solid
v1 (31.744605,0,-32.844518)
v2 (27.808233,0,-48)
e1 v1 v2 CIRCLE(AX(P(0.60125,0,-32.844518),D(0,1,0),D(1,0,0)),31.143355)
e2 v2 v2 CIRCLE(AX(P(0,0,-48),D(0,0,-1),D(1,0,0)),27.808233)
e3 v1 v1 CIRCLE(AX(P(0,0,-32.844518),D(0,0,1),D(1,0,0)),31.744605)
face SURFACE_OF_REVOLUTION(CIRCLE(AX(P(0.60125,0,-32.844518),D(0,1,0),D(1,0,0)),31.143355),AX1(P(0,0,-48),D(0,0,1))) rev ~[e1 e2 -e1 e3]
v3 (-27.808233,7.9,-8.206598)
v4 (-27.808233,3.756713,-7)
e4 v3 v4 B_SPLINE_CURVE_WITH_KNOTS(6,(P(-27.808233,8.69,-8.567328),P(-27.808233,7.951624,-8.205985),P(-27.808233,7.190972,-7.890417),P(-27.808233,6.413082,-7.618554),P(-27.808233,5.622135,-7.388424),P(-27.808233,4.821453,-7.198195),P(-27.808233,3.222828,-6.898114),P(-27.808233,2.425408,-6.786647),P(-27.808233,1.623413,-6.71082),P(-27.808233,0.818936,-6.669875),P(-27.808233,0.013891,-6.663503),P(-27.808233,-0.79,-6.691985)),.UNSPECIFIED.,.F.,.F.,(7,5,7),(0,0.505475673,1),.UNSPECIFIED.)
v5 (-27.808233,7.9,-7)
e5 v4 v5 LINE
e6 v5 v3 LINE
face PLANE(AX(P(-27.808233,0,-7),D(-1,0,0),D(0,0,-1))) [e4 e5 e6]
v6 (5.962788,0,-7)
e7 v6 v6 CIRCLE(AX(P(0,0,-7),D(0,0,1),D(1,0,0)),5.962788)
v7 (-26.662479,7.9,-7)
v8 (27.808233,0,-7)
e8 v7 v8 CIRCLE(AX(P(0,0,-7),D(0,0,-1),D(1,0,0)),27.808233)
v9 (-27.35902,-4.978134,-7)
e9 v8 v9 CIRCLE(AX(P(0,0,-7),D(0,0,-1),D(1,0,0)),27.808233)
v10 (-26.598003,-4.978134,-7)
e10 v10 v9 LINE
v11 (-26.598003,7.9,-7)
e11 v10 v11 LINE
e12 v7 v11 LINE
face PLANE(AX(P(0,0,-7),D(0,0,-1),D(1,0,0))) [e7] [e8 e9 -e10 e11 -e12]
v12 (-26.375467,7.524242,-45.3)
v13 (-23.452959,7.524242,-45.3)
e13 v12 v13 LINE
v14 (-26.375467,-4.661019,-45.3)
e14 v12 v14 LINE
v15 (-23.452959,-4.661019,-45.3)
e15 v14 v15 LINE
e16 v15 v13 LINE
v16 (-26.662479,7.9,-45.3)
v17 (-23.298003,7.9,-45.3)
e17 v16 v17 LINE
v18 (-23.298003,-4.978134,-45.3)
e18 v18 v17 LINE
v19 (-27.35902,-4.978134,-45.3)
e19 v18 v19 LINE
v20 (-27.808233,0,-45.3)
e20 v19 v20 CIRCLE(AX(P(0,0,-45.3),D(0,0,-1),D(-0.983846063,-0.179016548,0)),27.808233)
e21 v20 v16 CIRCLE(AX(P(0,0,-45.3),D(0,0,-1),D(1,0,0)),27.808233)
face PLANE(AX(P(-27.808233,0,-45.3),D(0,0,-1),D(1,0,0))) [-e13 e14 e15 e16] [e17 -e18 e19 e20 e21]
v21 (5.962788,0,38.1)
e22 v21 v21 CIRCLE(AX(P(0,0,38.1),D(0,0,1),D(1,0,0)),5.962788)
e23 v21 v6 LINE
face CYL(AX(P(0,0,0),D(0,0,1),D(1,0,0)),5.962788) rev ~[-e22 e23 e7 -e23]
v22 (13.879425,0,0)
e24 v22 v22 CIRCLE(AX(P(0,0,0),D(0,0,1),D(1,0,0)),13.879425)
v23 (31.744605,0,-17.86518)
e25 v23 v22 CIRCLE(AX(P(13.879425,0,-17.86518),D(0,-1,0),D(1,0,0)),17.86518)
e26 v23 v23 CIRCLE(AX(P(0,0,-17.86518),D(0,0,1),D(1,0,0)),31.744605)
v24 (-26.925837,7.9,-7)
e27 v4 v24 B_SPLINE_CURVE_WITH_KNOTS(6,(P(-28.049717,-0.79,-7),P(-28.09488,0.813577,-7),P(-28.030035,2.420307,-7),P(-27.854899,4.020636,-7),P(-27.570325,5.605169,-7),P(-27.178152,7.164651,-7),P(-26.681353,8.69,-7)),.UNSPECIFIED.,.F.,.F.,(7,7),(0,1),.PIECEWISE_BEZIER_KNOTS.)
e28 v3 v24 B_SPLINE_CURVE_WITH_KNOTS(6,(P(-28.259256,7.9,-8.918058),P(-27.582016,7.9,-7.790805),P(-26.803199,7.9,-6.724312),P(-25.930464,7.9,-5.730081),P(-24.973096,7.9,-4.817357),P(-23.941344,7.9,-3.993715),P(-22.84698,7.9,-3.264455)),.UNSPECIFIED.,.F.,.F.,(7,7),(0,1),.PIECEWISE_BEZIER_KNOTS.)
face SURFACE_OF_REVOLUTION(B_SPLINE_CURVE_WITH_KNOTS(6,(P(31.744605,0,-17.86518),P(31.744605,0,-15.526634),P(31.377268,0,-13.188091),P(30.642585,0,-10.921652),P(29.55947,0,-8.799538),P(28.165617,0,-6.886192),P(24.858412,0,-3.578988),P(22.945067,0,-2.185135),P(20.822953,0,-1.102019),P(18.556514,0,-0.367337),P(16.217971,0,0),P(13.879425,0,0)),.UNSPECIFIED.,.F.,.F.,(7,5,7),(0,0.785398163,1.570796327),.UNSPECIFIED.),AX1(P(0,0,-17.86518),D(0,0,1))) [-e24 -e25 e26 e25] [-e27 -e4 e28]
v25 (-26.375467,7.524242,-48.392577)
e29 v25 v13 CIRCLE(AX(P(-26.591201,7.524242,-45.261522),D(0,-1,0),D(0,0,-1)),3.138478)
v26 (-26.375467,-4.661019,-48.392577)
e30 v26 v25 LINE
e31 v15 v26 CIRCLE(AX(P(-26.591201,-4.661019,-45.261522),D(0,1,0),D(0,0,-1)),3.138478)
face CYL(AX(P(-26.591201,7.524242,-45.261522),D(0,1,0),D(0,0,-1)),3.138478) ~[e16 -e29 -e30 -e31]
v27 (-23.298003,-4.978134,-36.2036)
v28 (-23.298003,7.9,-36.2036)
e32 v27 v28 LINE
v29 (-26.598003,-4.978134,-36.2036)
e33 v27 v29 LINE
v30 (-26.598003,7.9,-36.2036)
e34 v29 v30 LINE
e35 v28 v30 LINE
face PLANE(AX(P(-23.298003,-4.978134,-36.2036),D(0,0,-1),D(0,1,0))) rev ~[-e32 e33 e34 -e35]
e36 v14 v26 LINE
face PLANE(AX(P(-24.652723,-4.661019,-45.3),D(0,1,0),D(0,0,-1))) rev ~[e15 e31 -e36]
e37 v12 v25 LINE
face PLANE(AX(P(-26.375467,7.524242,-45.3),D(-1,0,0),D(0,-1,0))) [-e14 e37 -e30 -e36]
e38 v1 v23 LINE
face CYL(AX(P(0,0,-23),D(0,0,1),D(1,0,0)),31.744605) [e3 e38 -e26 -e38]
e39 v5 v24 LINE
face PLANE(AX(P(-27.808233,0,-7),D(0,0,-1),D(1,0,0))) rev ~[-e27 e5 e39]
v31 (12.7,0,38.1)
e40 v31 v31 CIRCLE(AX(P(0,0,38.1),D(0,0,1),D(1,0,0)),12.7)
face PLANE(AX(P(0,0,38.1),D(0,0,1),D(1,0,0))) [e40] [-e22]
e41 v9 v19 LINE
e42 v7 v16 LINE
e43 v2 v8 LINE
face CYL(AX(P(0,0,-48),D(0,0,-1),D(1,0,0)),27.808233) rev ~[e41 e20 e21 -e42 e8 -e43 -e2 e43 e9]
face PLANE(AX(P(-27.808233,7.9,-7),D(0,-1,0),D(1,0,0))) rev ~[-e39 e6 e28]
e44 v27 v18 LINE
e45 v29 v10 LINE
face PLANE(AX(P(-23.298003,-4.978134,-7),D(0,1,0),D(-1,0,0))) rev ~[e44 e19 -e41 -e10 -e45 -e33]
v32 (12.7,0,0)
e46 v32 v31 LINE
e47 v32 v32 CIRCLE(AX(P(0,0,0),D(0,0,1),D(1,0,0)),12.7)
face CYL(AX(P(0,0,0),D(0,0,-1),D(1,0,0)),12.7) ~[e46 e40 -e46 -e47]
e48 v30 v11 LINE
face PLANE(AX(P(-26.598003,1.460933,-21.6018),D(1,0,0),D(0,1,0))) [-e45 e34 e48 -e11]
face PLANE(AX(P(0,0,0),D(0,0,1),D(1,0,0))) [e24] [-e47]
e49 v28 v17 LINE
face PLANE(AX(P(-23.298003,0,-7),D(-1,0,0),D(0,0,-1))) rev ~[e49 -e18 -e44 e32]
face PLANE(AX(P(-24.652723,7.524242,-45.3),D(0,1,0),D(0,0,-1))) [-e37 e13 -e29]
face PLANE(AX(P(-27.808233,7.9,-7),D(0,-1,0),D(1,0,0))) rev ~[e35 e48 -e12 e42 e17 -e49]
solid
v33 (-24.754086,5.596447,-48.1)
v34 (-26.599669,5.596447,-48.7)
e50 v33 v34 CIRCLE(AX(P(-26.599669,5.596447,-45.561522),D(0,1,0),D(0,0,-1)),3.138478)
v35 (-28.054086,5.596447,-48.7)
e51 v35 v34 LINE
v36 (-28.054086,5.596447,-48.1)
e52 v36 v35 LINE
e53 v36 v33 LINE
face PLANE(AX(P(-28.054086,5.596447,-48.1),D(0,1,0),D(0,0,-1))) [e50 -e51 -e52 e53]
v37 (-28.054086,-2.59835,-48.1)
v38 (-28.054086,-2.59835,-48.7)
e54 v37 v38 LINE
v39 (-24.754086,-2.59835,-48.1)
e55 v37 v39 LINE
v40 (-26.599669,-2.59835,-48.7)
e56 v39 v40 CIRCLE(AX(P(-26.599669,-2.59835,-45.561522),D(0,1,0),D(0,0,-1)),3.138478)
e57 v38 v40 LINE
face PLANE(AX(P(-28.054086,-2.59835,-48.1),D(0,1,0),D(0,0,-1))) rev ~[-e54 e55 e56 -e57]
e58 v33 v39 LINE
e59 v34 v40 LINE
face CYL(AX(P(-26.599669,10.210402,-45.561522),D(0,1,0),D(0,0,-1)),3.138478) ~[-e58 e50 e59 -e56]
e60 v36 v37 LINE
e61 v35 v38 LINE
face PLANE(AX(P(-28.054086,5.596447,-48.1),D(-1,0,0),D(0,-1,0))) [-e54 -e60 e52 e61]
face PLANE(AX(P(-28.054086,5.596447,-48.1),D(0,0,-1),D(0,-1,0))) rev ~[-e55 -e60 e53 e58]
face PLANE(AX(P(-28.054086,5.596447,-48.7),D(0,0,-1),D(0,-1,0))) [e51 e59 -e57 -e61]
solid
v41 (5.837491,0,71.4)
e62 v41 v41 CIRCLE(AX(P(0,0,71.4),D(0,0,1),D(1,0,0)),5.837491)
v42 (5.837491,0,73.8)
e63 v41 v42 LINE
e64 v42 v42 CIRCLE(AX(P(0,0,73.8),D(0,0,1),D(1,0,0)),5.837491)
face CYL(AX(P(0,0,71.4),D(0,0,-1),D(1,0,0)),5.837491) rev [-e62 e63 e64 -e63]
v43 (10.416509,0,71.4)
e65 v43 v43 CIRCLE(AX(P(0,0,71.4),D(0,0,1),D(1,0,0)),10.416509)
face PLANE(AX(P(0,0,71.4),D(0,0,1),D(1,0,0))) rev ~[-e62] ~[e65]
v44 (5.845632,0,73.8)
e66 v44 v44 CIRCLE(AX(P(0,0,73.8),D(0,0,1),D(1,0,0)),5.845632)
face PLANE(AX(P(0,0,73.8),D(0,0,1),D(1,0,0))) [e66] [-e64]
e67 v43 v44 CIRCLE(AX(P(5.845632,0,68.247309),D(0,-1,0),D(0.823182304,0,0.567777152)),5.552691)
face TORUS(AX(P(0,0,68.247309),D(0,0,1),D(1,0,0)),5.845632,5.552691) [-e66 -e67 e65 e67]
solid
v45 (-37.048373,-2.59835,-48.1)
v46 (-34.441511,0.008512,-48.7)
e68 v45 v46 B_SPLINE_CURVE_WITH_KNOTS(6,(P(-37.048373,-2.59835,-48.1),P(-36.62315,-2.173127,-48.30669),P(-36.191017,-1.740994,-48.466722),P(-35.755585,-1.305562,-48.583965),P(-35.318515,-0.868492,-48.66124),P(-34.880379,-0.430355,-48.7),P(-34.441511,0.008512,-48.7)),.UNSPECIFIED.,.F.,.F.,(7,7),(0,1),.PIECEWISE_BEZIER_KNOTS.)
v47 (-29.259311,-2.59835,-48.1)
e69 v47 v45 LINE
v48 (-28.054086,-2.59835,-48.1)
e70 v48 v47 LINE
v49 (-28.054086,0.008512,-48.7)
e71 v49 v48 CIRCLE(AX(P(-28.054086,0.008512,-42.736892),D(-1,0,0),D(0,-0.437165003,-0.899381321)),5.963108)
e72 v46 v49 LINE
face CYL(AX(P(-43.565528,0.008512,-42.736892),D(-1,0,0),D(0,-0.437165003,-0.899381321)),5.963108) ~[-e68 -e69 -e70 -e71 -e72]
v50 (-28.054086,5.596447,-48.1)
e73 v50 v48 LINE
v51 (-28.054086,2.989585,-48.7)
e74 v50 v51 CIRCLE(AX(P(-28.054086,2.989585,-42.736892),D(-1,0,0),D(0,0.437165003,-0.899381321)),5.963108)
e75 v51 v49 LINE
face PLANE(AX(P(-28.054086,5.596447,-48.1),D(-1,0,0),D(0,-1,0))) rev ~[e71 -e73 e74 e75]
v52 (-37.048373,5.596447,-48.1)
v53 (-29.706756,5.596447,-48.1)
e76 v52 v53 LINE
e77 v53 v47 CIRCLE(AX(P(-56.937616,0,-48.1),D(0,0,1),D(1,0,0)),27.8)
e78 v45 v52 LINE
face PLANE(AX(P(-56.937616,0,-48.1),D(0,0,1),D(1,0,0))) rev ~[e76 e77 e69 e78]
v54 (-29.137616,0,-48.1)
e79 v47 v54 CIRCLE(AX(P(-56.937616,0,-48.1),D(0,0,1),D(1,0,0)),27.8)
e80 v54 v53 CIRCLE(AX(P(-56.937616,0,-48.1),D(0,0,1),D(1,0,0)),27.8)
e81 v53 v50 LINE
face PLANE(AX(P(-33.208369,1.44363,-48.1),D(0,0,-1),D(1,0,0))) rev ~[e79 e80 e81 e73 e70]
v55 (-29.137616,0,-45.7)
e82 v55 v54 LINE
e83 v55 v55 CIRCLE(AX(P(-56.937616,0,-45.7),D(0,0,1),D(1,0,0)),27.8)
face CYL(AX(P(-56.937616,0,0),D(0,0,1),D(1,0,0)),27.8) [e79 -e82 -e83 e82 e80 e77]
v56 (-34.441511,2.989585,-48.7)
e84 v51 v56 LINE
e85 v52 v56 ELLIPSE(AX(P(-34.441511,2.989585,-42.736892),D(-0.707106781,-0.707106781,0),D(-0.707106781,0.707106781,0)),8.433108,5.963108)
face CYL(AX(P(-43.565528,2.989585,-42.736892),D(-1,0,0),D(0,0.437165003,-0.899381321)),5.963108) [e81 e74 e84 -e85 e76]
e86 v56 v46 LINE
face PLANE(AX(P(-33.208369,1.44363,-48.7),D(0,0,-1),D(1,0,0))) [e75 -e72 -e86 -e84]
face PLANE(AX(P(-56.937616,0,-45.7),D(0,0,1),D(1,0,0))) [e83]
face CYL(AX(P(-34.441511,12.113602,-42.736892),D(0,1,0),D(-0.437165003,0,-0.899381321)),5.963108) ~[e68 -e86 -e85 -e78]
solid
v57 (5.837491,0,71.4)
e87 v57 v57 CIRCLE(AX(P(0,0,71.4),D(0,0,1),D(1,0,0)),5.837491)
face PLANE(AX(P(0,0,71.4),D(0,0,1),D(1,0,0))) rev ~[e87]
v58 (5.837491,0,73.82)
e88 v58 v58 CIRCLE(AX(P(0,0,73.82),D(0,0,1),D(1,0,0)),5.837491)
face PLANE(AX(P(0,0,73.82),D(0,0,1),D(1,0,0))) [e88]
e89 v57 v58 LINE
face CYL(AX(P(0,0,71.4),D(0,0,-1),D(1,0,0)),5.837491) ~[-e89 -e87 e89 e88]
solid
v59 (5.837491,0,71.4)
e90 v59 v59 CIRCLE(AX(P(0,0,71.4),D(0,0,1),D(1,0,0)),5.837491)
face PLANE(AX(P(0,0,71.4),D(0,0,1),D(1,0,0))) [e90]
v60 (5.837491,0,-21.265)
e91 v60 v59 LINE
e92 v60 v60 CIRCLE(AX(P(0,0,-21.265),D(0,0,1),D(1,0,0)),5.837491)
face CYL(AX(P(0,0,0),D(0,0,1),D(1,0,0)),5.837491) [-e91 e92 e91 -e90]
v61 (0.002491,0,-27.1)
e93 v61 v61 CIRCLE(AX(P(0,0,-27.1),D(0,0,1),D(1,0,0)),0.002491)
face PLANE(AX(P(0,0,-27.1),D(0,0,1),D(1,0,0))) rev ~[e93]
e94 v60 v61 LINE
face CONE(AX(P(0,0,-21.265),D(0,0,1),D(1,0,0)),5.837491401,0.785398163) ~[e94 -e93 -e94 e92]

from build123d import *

# Parameters (mm, degrees)
F0_R           = 12.7
F1_DEPTH       = 38.1
F2_R           = 5.9627881531
F3_DEPTH       = 38.101
F4_R           = 31.7446048685
F5_DEPTH       = 23
F6_DEPTH       = 25
F7_R           = 27.8082327549
F8_DEPTH       = 41
F9_DEPTH       = 49
F10_R          = 17.8651803616
F13_DEPTH      = 38.3
F14_DEPTH      = 7.9
F15_W          = 12.8781338312
F15_H          = 29.2036004663
F16_DEPTH      = 3.3
F17_W          = 1.7227437347
F17_H          = 12.1852611192
F18_DEPTH      = 3.1
F19_R          = 27.8
F20_DEPTH      = 48.1
F21_DEPTH      = 45.7
F23_DEPTH      = 0.6
F24_R          = 5.8374914011
F25_DEPTH      = 27.1
F26_DEPTH      = 71.4
F27_R          = 10.4165090819
F27_R_2        = 5.8374914011
F28_DEPTH      = 2.4
F29_DEPTH      = 2.6
F30_DEPTH      = 3.3
F31_DEPTH      = 1.2
F32_T4_DEPTH   = 20.0314551969
F32_2_T1_DEPTH = 17.4227077627
F33_SIZE       = 5.835
F35_DEPTH      = 0.18
F36_T1_DEPTH   = 13.8587724822
F36_T3_DEPTH   = 8.1698239296
F36_T5_DEPTH   = 21.2291069713
F36_T7_DEPTH   = 7.7223795322
F36_T9_DEPTH   = 14.3062168796


# Not quite as in the source:
# - a fillet or chamfer that OpenCascade refuses, or shapes differently, is made with other operations: its cross-section is extruded or revolved along the edge and cut away or added


with BuildPart() as f1:
    # F0 (on Top) → F1 (new body)
    with BuildSketch(Plane.XY):
        Circle(F0_R)
    extrude(amount=F1_DEPTH)

    # F2 (on face) → F3 (cut, through all)
    with BuildSketch(Plane.XY.offset(38.1)):
        Circle(F2_R)
    extrude(amount=-F3_DEPTH, mode=Mode.SUBTRACT)

    # F4 (on Top) → F5 (join)
    with BuildSketch(Plane.XY):
        Circle(F4_R)
    extrude(amount=-F5_DEPTH)

    # F6 (add): a face of the model
    f6_faces = [f1.faces().sort_by_distance(p)[0] for p in [
        (0, 0, -23),
    ]]
    extrude(f6_faces, amount=F6_DEPTH)

    # F7 (on face) → F8 (cut)
    with BuildSketch(Plane(origin=(0, 0, -48), x_dir=(1, 0, 0), z_dir=(0, 0, -1))):
        Circle(F7_R)
    extrude(amount=-F8_DEPTH, mode=Mode.SUBTRACT)

    # F9 (cut): a face of the model
    f9_faces = [f1.faces().sort_by_distance(p)[0] for p in [
        (0, 0, 0),
    ]]
    extrude(f9_faces, amount=-F9_DEPTH, mode=Mode.SUBTRACT)

    # F10
    f10_edges = [f1.edges().sort_by_distance(p)[0] for p in [
        (-31.744605, 0, 0),
    ]]
    fillet(f10_edges, radius=F10_R)

    # F11: fillet of radius 31.1433549546 on 1 edges, made by hand

    # F11_s1 → F11_t2 (revolve, cut)
    with BuildSketch(Plane.XZ):
        with BuildLine():
            ThreePointArc((31.7446048685, -32.8445177405), (30.7444521466, -40.6736886407), (27.8082327549, -48))
            Line((27.8082327549, -48), (28.3523724117, -48.3031096452))
            ThreePointArc((28.3523724117, -48.3031096452), (29.7764188117, -48.6228670991), (31.7446048685, -48.6228670991))
            Line((31.7446048685, -48.6228670991), (32.3674719676, -48))
            Line((32.3674719676, -48), (32.3674719676, -32.8445177405))
            Line((32.3674719676, -32.8445177405), (31.7446048685, -32.8445177405))
        make_face()
    revolve(axis=Axis((0, 0, -48), (0, 0, 1)), mode=Mode.SUBTRACT)

    # F12 (on face) → F13 (join)
    with BuildSketch(Plane(origin=(0, 0, -7), x_dir=(1, 0, 0), z_dir=(0, 0, -1))):
        with BuildLine():
            ThreePointArc((-27.3590203134, 4.9781338312), (-27.6957019569, 2.4991802785), (-27.8082327549, 0))
            Line((-27.8082327549, 0), (-23.2980027795, 0))
            Line((-23.2980027795, 0), (-23.2980027795, 4.9781338312))
            Line((-23.2980027795, 4.9781338312), (-27.3590203134, 4.9781338312))
        make_face()
    extrude(amount=F13_DEPTH)

    # F14 (add): a face of the model
    f14_faces = [f1.faces().sort_by_distance(p)[0] for p in [
        (-25.5531177672, 0, -26.15),
    ]]
    extrude(f14_faces, amount=F14_DEPTH)

    # F15 (on face) → F16 (cut)
    with BuildSketch(Plane.YZ.offset(-23.2980027795)):
        with Locations((1.4609330844, -21.6018002331)):
            Rectangle(F15_W, F15_H)
    extrude(amount=-F16_DEPTH, mode=Mode.SUBTRACT)

    # F17 (on face) → F18 (join)
    with BuildSketch(Plane(origin=(0, 0, -45.3), x_dir=(1, 0, 0), z_dir=(0, 0, -1))):
        with Locations((-25.5140950903, -1.4316115994)):
            Rectangle(F17_W, F17_H)
    extrude(amount=F18_DEPTH)

    # F31 (add): a face of the model
    f31_faces = [f1.faces().sort_by_distance(p)[0] for p in [
        (-24.652723223, 1.4316115994, -46.85),
    ]]
    extrude(f31_faces, amount=F31_DEPTH)

    # F32: fillet of radius 3.1384776311 on 1 edges, made by hand


with BuildPart() as f20:
    # F19 (on Top) → F20 (new body)
    with BuildSketch(Plane.XY):
        with Locations((-56.9376163185, 0)):
            Circle(F19_R)
    extrude(amount=-F20_DEPTH)

    # F21 (cut): a face of the model
    f21_faces = [f20.faces().sort_by_distance(p)[0] for p in [
        (-56.9376163185, 0, 0),
    ]]
    extrude(f21_faces, amount=-F21_DEPTH, mode=Mode.SUBTRACT)

    # F22 (on face) → F23 (join)
    with BuildSketch(Plane(origin=(0, 0, -48.1), x_dir=(1, 0, 0), z_dir=(0, 0, -1))):
        with BuildLine():
            ThreePointArc((-29.1376163185, 0), (-29.1680566948, 1.3005992115), (-29.2593111608, 2.5983501691))
            Line((-29.2593111608, 2.5983501691), (-37.0483733714, 2.5983501691))
            Line((-37.0483733714, 2.5983501691), (-37.0483733714, -5.5964472704))
            Line((-37.0483733714, -5.5964472704), (-29.7067555544, -5.5964472704))
            ThreePointArc((-29.7067555544, -5.5964472704), (-29.2802671212, -2.8126562854), (-29.1376163185, 0))
        make_face()
        with BuildLine():
            Line((-28.0540864915, -5.5964472704), (-28.0540864915, 2.5983501691))
            Line((-28.0540864915, 2.5983501691), (-29.2593111608, 2.5983501691))
            ThreePointArc((-29.2593111608, 2.5983501691), (-29.1680566948, 1.3005992115), (-29.1376163185, 0))
            ThreePointArc((-29.1376163185, 0), (-29.2802671212, -2.8126562854), (-29.7067555544, -5.5964472704))
            Line((-29.7067555544, -5.5964472704), (-28.0540864915, -5.5964472704))
        make_face()
    extrude(amount=F23_DEPTH)


with BuildPart() as f25:
    # F24 (on Top) → F25 (new body)
    with BuildSketch(Plane.XY):
        Circle(F24_R)
    extrude(amount=-F25_DEPTH)

    # F26 (add): a face of the model
    f26_faces = [f25.faces().sort_by_distance(p)[0] for p in [
        (0, 0, 0),
    ]]
    extrude(f26_faces, amount=F26_DEPTH)


with BuildPart() as f28:
    # F27 (on face) → F28 (new body)
    with BuildSketch(Plane.XY.offset(71.4)):
        Circle(F27_R)
        Circle(F27_R_2, mode=Mode.SUBTRACT)
    extrude(amount=F28_DEPTH)

    # F34: fillet of radius 5.5526911935 on 1 edges, made by hand

    # F34_s1 → F34_t2 (revolve, cut)
    with BuildSketch(Plane.XZ):
        with BuildLine():
            ThreePointArc((10.4165090819, 71.4), (8.426955147, 73.1635217858), (5.8456319529, 73.8))
            Line((5.8456319529, 73.8), (10.4165090819, 73.8))
            Line((10.4165090819, 73.8), (10.4165090819, 71.4))
        make_face()
    revolve(axis=Axis((0, 0, 73.8), (0, 0, 1)), mode=Mode.SUBTRACT)


with BuildPart() as f29:
    # F29 (new): a face of the model
    f29_faces = [f25.part.faces().sort_by_distance(p)[0] for p in [
        (0, 0, 71.4),
    ]]
    extrude(f29_faces, amount=F29_DEPTH)

    # F35 (cut): a face of the model
    f35_faces = [f29.faces().sort_by_distance(p)[0] for p in [
        (0, 0, 74),
    ]]
    extrude(f35_faces, amount=-F35_DEPTH, mode=Mode.SUBTRACT)


with BuildPart() as f30:
    # F30 (new): a face of the model
    f30_faces = [f20.part.faces().sort_by_distance(p)[0] for p in [
        (-28.0540864915, 1.4990485506, -48.4),
    ]]
    extrude(f30_faces, amount=F30_DEPTH)

    # F32#2: fillet of radius 3.1384776311 on 1 edges, made by hand

    # F32_2_s2 → F32_2_t1 (cut)
    with BuildSketch(Plane.XZ.offset(-10.210402432)):
        with BuildLine():
            ThreePointArc((-26.5996685561, -48.7), (-25.6293370203, -48.5462331676), (-24.7540864915, -48.1))
            Line((-24.7540864915, -48.1), (-24.7540864915, -48.7))
            Line((-24.7540864915, -48.7), (-26.5996685561, -48.7))
        make_face()
    extrude(amount=F32_2_T1_DEPTH, mode=Mode.SUBTRACT)


with BuildPart() as f32_tool2:
    # F32_s3 → F32_t4 (new body)
    with BuildSketch(Plane.XZ.offset(-7.524242159)):
        with BuildLine():
            ThreePointArc((-26.5912008541, -48.4), (-24.3719620385, -47.4807611845), (-23.452723223, -45.2615223689))
            Line((-23.452723223, -45.2615223689), (-23.452723223, -48.4))
            Line((-23.452723223, -48.4), (-26.5912008541, -48.4))
        make_face()
    extrude(amount=F32_T4_DEPTH)

    split(bisect_by=Plane.XY.offset(-45.3), keep=Keep.BOTTOM)

    split(bisect_by=Plane.XZ.offset(4.9781338312), keep=Keep.BOTTOM)


with BuildPart() as f1_1:
    add(f1.part)

    # F32_t1: cut F32_tool2
    add(f32_tool2.part, mode=Mode.SUBTRACT)


with BuildPart() as f25_1:
    add(f25.part)

    # F33
    f33_edges = [f25_1.edges().sort_by_distance(p)[0] for p in [
        (-5.837491, 0, -27.1),
    ]]
    chamfer(f33_edges, length=F33_SIZE)


with BuildPart() as f20_1:
    add(f20.part)

    # F36: fillet of radius 5.9631074991 on 3 edges, made by hand

    # F36_s2 → F36_t1 (cut)
    with BuildSketch(Plane.YZ.offset(-43.5655281373)):
        with BuildLine():
            ThreePointArc((5.5964472704, -48.1), (4.3270950835, -48.5480643961), (2.989585364, -48.7))
            Line((2.989585364, -48.7), (5.5964472704, -48.7))
            Line((5.5964472704, -48.7), (5.5964472704, -48.1))
        make_face()
    extrude(amount=F36_T1_DEPTH, mode=Mode.SUBTRACT)

    # F36_s4 → F36_t3 (cut)
    with BuildSketch(Plane.YZ.offset(-29.7067556551)):
        with BuildLine():
            ThreePointArc((5.5964472704, -48.1), (4.3270950835, -48.5480643961), (2.989585364, -48.7))
            Line((2.989585364, -48.7), (5.5964472704, -48.7))
            Line((5.5964472704, -48.7), (5.5964472704, -48.1))
        make_face()
    extrude(amount=F36_T3_DEPTH, mode=Mode.SUBTRACT)

    # F36_s6 → F36_t5 (cut)
    with BuildSketch(Plane.XZ.offset(-12.1136020363)):
        with BuildLine():
            ThreePointArc((-37.0483733714, -48.1), (-35.7790211845, -48.5480643961), (-34.441511465, -48.7))
            Line((-34.441511465, -48.7), (-37.0483733714, -48.7))
            Line((-37.0483733714, -48.7), (-37.0483733714, -48.1))
        make_face()
    extrude(amount=F36_T5_DEPTH, mode=Mode.SUBTRACT)

    # F36_s8 → F36_t7 (cut)
    with BuildSketch(Plane.YZ.offset(-29.2593112577)):
        with BuildLine():
            ThreePointArc((-2.5983501691, -48.1), (-1.3289979823, -48.5480643961), (0.0085117372, -48.7))
            Line((0.0085117372, -48.7), (-2.5983501691, -48.7))
            Line((-2.5983501691, -48.7), (-2.5983501691, -48.1))
        make_face()
    extrude(amount=F36_T7_DEPTH, mode=Mode.SUBTRACT)

    # F36_s10 → F36_t9 (cut)
    with BuildSketch(Plane.YZ.offset(-43.5655281373)):
        with BuildLine():
            ThreePointArc((-2.5983501691, -48.1), (-1.3289979823, -48.5480643961), (0.0085117372, -48.7))
            Line((0.0085117372, -48.7), (-2.5983501691, -48.7))
            Line((-2.5983501691, -48.7), (-2.5983501691, -48.1))
        make_face()
    extrude(amount=F36_T9_DEPTH, mode=Mode.SUBTRACT)


solid = Compound([f28.part, f29.part, f30.part, f1_1.part, f25_1.part, f20_1.part])
